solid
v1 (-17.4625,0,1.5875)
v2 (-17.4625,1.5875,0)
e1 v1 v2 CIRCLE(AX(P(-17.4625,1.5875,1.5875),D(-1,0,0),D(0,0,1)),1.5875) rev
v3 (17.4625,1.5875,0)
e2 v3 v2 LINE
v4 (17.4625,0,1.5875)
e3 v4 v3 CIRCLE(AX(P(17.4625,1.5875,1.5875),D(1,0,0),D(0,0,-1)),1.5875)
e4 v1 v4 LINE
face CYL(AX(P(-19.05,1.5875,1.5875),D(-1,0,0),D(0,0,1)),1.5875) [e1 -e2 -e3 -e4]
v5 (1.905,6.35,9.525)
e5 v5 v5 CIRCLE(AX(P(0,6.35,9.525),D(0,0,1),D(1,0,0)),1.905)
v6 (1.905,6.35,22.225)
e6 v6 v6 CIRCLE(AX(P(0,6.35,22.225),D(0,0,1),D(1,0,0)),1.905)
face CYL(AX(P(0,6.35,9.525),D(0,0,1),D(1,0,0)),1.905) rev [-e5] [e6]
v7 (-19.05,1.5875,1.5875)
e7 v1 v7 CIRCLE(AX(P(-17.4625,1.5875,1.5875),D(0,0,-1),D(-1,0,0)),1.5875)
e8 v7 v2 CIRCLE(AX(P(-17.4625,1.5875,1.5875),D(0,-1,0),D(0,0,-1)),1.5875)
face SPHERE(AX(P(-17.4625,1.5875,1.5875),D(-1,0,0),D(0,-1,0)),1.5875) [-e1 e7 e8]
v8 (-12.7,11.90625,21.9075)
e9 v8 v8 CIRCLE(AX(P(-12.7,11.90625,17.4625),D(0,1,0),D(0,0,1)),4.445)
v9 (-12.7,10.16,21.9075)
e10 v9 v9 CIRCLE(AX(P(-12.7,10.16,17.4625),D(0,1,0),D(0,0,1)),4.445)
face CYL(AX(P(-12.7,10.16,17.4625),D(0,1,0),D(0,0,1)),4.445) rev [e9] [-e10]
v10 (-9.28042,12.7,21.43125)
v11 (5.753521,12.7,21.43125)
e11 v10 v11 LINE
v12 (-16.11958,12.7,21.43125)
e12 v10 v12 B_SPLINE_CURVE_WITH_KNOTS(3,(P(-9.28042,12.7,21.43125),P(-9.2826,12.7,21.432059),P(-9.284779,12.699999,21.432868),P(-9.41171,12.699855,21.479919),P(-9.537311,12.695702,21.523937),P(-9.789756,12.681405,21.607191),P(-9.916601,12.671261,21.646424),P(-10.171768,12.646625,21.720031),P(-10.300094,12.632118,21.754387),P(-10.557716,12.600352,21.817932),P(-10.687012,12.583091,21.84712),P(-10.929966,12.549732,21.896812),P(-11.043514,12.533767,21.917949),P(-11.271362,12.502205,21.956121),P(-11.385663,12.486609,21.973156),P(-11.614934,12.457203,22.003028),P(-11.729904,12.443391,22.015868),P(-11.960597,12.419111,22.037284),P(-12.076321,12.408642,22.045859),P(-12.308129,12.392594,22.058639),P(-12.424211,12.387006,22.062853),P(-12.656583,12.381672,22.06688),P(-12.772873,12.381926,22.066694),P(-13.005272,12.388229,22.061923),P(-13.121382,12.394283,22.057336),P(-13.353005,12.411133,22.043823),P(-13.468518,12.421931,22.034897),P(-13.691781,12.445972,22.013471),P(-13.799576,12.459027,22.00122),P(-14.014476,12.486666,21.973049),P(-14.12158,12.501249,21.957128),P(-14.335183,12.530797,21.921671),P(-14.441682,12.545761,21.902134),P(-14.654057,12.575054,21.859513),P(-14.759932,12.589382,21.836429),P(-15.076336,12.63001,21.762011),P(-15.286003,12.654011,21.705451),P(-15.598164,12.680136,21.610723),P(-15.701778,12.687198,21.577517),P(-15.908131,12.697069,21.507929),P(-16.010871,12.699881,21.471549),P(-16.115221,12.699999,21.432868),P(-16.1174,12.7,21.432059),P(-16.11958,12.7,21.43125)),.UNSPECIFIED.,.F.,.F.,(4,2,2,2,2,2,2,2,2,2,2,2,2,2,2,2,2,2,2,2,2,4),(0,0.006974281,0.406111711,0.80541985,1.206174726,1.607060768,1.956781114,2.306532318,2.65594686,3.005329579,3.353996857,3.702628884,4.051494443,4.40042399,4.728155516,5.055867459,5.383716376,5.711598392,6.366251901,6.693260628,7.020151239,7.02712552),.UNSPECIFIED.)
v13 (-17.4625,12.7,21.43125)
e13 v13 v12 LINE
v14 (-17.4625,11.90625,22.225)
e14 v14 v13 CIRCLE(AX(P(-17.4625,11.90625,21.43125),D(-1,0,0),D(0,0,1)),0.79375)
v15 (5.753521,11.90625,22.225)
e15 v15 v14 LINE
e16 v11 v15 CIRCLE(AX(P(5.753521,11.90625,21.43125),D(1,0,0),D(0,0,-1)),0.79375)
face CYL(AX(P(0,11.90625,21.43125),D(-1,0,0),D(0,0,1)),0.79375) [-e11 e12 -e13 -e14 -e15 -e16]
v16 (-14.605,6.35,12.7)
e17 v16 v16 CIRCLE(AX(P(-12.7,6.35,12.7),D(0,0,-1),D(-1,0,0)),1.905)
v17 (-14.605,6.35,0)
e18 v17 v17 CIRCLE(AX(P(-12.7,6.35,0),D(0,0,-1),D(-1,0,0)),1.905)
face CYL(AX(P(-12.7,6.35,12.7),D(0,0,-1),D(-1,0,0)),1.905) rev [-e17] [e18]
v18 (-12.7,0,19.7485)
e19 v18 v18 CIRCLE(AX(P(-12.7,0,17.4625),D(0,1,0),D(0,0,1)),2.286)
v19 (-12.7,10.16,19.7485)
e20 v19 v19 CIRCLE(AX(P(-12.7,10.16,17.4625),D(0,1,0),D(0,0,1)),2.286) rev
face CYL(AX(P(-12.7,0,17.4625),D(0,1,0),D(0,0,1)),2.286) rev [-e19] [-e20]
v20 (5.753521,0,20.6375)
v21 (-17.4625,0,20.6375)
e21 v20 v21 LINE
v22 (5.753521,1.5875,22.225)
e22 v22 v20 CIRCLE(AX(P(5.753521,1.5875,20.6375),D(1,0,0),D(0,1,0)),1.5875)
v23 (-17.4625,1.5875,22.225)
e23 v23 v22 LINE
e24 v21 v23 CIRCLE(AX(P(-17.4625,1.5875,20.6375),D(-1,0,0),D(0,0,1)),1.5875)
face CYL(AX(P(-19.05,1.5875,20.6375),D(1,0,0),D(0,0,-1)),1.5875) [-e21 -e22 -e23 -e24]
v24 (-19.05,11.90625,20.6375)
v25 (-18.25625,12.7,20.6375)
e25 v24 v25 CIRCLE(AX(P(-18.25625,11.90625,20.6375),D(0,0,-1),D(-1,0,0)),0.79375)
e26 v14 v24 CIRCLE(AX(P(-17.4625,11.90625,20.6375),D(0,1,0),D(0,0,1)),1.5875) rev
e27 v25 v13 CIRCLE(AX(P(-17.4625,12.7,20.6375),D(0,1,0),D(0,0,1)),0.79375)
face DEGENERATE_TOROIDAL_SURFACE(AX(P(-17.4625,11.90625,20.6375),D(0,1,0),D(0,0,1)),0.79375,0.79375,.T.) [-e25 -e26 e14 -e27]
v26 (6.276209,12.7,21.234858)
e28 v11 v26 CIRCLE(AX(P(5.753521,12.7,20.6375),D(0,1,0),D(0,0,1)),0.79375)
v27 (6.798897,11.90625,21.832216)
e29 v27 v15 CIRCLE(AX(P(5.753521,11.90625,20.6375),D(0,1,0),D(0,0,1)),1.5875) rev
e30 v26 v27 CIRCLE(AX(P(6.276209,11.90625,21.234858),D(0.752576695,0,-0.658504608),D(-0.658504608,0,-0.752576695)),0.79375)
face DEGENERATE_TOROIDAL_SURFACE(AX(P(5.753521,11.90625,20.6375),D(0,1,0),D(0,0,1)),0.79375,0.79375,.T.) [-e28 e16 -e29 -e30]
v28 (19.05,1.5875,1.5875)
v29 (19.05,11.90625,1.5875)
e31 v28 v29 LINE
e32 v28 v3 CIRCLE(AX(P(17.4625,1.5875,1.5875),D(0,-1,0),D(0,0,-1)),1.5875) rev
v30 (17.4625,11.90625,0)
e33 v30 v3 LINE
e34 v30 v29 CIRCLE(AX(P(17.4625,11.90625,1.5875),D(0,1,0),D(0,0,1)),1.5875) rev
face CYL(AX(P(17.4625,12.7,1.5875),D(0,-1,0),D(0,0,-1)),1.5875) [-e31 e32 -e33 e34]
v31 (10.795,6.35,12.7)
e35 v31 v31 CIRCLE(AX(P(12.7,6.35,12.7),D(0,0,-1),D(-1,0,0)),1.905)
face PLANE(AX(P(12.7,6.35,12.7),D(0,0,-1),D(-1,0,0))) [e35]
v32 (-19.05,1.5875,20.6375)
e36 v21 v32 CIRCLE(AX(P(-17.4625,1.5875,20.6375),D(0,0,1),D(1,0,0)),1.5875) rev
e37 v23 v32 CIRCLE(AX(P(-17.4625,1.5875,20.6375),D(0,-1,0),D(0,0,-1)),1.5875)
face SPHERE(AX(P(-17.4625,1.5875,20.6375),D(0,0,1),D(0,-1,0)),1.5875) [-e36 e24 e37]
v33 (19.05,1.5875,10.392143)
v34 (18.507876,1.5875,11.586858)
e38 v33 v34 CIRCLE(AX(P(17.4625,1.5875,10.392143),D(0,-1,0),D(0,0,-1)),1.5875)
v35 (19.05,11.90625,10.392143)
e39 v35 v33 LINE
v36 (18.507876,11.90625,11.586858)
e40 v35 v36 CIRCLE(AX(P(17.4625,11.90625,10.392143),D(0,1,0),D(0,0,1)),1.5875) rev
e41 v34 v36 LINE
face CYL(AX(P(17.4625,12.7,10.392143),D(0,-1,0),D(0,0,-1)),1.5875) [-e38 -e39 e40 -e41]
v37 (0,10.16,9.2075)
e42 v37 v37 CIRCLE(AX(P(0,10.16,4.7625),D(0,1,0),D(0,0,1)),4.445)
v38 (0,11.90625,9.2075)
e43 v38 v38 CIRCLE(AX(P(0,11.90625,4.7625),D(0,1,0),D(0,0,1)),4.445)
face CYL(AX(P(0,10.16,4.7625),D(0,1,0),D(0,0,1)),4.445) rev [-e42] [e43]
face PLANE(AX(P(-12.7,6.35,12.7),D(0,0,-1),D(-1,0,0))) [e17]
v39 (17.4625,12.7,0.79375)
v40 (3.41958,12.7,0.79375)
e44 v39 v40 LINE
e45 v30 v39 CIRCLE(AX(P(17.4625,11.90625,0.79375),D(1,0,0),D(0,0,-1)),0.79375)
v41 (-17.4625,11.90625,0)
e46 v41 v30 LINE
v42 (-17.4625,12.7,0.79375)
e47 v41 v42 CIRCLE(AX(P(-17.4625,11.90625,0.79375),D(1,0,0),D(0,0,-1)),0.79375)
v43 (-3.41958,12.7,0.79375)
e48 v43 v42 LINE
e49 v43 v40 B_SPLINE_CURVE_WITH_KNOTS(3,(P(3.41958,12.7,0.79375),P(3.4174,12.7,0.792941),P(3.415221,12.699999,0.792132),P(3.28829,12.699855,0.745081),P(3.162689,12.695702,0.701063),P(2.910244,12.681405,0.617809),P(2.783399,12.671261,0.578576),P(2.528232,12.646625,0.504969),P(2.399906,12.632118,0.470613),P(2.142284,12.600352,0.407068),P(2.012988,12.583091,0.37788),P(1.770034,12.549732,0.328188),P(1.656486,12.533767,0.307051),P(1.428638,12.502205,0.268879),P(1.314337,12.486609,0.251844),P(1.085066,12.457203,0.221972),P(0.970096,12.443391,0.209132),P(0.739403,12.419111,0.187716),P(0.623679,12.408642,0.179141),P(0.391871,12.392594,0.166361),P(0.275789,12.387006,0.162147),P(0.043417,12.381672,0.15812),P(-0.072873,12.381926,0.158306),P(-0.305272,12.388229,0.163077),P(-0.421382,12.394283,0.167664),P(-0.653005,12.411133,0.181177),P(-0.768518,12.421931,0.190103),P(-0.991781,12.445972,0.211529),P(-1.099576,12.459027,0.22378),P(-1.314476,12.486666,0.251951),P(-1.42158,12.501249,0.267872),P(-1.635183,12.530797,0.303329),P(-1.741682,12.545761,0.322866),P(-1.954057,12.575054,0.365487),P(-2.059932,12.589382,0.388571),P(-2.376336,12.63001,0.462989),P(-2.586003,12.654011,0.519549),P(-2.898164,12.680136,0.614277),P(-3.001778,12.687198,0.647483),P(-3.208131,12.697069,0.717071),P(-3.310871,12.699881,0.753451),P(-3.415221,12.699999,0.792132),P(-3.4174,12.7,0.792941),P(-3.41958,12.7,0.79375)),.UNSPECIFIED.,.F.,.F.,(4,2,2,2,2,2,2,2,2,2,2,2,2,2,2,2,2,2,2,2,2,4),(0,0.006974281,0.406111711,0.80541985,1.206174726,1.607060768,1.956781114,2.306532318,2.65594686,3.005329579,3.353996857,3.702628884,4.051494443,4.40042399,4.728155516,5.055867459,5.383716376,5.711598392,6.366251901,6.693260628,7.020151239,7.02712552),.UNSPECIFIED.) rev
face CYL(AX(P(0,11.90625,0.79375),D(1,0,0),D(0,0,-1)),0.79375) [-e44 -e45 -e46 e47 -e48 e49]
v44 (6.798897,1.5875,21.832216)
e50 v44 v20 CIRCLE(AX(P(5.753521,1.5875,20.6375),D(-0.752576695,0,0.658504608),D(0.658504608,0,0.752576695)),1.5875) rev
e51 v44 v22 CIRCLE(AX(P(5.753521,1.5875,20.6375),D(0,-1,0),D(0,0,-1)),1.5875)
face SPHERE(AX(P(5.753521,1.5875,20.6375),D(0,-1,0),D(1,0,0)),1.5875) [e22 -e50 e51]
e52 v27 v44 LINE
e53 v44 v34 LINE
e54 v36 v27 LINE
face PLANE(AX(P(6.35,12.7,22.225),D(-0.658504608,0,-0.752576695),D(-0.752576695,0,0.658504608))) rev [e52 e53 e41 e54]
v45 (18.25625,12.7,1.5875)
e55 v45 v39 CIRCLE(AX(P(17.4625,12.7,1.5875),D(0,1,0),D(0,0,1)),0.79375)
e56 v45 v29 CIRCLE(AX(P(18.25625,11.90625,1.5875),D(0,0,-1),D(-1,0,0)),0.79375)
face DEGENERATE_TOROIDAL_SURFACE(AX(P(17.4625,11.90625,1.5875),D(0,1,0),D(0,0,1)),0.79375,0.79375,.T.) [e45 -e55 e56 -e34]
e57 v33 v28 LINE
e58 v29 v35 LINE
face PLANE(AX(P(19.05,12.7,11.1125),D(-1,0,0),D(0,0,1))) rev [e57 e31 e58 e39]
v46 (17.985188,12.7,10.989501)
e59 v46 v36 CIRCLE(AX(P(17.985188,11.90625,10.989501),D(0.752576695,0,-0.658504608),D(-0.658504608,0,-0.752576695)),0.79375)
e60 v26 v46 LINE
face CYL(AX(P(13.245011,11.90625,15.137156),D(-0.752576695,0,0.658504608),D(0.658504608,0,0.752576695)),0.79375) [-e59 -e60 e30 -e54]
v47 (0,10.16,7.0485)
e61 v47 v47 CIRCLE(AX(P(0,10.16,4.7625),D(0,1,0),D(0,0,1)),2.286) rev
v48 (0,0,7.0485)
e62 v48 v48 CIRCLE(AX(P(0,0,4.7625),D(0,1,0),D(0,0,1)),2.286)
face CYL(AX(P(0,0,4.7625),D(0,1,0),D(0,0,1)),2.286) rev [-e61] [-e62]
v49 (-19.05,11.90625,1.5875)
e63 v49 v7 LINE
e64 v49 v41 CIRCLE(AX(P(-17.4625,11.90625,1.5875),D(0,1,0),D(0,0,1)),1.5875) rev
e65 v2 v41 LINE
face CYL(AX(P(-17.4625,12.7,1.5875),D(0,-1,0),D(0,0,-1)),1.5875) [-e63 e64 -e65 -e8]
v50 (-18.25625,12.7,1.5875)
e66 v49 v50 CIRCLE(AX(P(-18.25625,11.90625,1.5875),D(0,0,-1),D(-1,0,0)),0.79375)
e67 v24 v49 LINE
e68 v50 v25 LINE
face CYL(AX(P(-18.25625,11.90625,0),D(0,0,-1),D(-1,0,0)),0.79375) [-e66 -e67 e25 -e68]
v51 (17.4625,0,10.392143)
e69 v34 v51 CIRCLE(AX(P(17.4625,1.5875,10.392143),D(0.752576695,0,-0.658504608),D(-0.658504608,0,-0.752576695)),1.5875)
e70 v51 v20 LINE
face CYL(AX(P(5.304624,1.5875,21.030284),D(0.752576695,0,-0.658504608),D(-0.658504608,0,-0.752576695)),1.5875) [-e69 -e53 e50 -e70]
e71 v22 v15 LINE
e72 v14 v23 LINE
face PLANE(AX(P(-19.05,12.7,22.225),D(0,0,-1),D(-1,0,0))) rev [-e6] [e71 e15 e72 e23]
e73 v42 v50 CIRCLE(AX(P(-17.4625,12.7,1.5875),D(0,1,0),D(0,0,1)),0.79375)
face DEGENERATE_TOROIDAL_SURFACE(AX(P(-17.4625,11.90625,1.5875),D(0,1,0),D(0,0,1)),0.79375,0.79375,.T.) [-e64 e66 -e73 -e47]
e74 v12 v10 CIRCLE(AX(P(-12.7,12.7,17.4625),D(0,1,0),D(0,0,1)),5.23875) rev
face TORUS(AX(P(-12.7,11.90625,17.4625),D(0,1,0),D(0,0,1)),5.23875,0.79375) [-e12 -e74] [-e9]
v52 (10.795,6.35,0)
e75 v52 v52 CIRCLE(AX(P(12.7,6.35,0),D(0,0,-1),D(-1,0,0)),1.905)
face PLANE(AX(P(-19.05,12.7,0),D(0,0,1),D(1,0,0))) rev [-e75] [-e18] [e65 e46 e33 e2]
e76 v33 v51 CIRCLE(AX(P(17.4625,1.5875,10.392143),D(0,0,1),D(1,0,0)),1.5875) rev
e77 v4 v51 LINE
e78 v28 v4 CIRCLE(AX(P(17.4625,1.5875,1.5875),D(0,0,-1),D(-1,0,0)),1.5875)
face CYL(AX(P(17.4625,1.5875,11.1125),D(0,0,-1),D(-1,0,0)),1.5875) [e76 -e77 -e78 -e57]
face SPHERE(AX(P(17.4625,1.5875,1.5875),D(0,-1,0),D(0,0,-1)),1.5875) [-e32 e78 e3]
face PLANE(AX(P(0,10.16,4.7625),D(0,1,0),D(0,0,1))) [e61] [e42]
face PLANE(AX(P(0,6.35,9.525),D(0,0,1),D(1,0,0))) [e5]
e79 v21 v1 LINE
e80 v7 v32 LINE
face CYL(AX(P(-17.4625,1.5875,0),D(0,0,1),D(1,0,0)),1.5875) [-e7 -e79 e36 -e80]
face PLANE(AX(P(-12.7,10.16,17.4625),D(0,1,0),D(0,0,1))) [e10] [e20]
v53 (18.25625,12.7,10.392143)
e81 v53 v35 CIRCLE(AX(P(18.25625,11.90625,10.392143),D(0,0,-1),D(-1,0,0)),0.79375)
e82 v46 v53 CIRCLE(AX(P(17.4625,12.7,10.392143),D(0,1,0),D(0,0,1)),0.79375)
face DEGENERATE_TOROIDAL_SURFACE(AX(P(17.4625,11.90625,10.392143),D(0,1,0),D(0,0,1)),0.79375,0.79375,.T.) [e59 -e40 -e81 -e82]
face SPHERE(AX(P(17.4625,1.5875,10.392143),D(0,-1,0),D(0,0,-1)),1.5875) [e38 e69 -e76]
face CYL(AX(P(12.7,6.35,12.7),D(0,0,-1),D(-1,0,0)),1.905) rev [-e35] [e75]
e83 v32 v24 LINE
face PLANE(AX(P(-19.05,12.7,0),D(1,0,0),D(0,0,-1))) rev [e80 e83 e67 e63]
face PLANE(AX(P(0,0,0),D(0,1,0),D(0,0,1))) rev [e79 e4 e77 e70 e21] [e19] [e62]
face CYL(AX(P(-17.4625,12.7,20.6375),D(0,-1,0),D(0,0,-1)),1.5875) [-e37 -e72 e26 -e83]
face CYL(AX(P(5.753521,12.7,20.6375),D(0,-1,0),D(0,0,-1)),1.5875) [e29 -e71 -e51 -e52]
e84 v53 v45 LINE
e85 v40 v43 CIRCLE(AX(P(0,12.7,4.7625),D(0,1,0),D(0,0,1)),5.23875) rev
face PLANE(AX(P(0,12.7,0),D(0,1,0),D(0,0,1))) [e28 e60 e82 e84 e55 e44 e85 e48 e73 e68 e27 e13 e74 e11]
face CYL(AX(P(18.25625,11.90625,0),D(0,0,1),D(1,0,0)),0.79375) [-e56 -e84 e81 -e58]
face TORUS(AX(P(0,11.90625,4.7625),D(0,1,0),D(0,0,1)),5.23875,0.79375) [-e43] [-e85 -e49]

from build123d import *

# Parameters (mm, degrees)
BOSS_EXTRUDE1_DEPTH = 12.7
SKETCH2_R           = 2.286
CUT_EXTRUDE1_DEPTH  = 32.908355097
SKETCH3_R           = 4.445
CUT_EXTRUDE2_DEPTH  = 2.54
SKETCH4_R           = 1.905
CUT_EXTRUDE3_DEPTH  = 12.7
SKETCH5_R           = 1.905
CUT_EXTRUDE4_DEPTH  = 12.7
FILLET1_R           = 1.5875
FILLET2_R           = 0.79375


with BuildPart() as part:
    # Sketch1 → Boss-Extrude1 (new body)
    with BuildSketch(Plane(origin=(0, 0, 0), x_dir=(1, 0, 0), z_dir=(0, 1, 0))):
        Polygon((-19.05, 0), (19.05, 0), (19.05, -11.1125), (6.35, -22.225), (-19.05, -22.225), align=None)
    extrude(amount=BOSS_EXTRUDE1_DEPTH)

    # Sketch2 → Cut-Extrude1 (cut, through all)
    with BuildSketch(Plane(origin=(0, 12.7, 0), x_dir=(1, 0, 0), z_dir=(0, 1, 0))):
        with Locations(Location((0, -4.7625, 0), (0, 0, 270))):
            Circle(SKETCH2_R)
        with Locations(Location((-12.7, -17.4625, 0), (0, 0, 270))):
            Circle(SKETCH2_R)
    extrude(amount=-CUT_EXTRUDE1_DEPTH, mode=Mode.SUBTRACT)

    # Sketch3 → Cut-Extrude2 (cut)
    with BuildSketch(Plane(origin=(0, 12.7, 0), x_dir=(1, 0, 0), z_dir=(0, 1, 0))):
        with Locations(Location((0, -4.7625, 0), (0, 0, 270))):
            Circle(SKETCH3_R)
        with Locations(Location((-12.7, -17.4625, 0), (0, 0, 270))):
            Circle(SKETCH3_R)
    extrude(amount=-CUT_EXTRUDE2_DEPTH, mode=Mode.SUBTRACT)

    # Sketch4 → Cut-Extrude3 (cut)
    with BuildSketch(Plane(origin=(0, 0, 0), x_dir=(-1, 0, 0), z_dir=(0, 0, -1))):
        with Locations((-12.7, 6.35)):
            Circle(SKETCH4_R)
        with Locations((12.7, 6.35)):
            Circle(SKETCH4_R)
    extrude(amount=-CUT_EXTRUDE3_DEPTH, mode=Mode.SUBTRACT)

    # Sketch5 → Cut-Extrude4 (cut)
    with BuildSketch(Plane.XY.offset(22.225)):
        with Locations((0, 6.35)):
            Circle(SKETCH5_R)
    extrude(amount=-CUT_EXTRUDE4_DEPTH, mode=Mode.SUBTRACT)

    # Fillet1
    fillet1_edges = [part.edges().sort_by_distance(p)[0] for p in [
        (-19.05, 0, 11.1125),
        (0, 0, 0),
        (19.05, 0, 5.55625),
        (12.7, 0, 16.66875),
        (-6.35, 0, 22.225),
        (-19.05, 6.35, 22.225),
        (-19.05, 6.35, 0),
        (19.05, 6.35, 0),
        (19.05, 6.35, 11.1125),
        (6.35, 6.35, 22.225),
    ]]
    fillet(fillet1_edges, radius=FILLET1_R)

    # Fillet2
    # the kernel refuses this fillet: 0.79375 mm, written as the material it takes off along each edge
    with BuildSketch(Plane(origin=(0, 12.7, 4.7625), x_dir=(0, 0, 1), z_dir=(-1, 0, 0))) as fillet2_piece_1:
        with BuildLine():
            CenterArc((4.445 + FILLET2_R, -FILLET2_R), FILLET2_R, 90, 90)
            Line((4.445, -FILLET2_R), (4.445, 0))
            Line((4.445, 0), (4.445 + FILLET2_R, 0))
        make_face()
    revolve(axis=Axis((0, 12.7, 4.7625), (0, 1, 0)), mode=Mode.SUBTRACT)
    with BuildSketch(Plane(origin=(-12.7, 12.7, 17.4625), x_dir=(0, 0, 1), z_dir=(-1, 0, 0))) as fillet2_piece_2:
        with BuildLine():
            CenterArc((4.445 + FILLET2_R, -FILLET2_R), FILLET2_R, 90, 90)
            Line((4.445, -FILLET2_R), (4.445, 0))
            Line((4.445, 0), (4.445 + FILLET2_R, 0))
        make_face()
    revolve(axis=Axis((-12.7, 12.7, 17.4625), (0, 1, 0)), mode=Mode.SUBTRACT)
    with BuildSketch(Plane(origin=(-17.4625, 12.7, 0), x_dir=(0, -1, 0), z_dir=(1, 0, 0))) as fillet2_piece_3:
        with BuildLine():
            CenterArc((FILLET2_R, -FILLET2_R), FILLET2_R, 90, 90)
            Line((0, -FILLET2_R), (0, 0))
            Line((0, 0), (FILLET2_R, 0))
        make_face()
    extrude(amount=34.925, mode=Mode.SUBTRACT)
    with BuildSketch(Plane(origin=(19.05, 12.7, 1.5875), x_dir=(-1, 0, 0), z_dir=(0, 0, 1))) as fillet2_piece_4:
        with BuildLine():
            CenterArc((FILLET2_R, FILLET2_R), FILLET2_R, 180, 90)
            Line((0, FILLET2_R), (0, 0))
            Line((0, 0), (FILLET2_R, 0))
        make_face()
    extrude(amount=8.80464294, mode=Mode.SUBTRACT)
    with BuildSketch(Plane(origin=(5.753520503, 12.7, 22.225), x_dir=(0, 0, -1), z_dir=(-1, 0, 0))) as fillet2_piece_5:
        with BuildLine():
            CenterArc((FILLET2_R, FILLET2_R), FILLET2_R, 180, 90)
            Line((0, FILLET2_R), (0, 0))
            Line((0, 0), (FILLET2_R, 0))
        make_face()
    extrude(amount=23.216020503, mode=Mode.SUBTRACT)
    with BuildSketch(Plane(origin=(18.507876065, 12.7, 11.586858443), x_dir=(-0.6585046078685184, 0, -0.7525766947068776), z_dir=(-0.7525766947068777, 0, 0.6585046078685184))) as fillet2_piece_6:
        with BuildLine():
            CenterArc((FILLET2_R, FILLET2_R), FILLET2_R, 180, 90)
            Line((0, FILLET2_R), (0, 0))
            Line((0, 0), (FILLET2_R, 0))
        make_face()
    extrude(amount=15.558519921, mode=Mode.SUBTRACT)
    with BuildSketch(Plane(origin=(-19.05, 12.7, 20.6375), x_dir=(1, 0, 0), z_dir=(0, 0, -1))) as fillet2_piece_7:
        with BuildLine():
            CenterArc((FILLET2_R, FILLET2_R), FILLET2_R, 180, 90)
            Line((0, FILLET2_R), (0, 0))
            Line((0, 0), (FILLET2_R, 0))
        make_face()
    extrude(amount=19.05, mode=Mode.SUBTRACT)
    with BuildSketch(Plane(origin=(-17.4625, 12.7, 20.6375), x_dir=(-1, 0, 0), z_dir=(0, 0, -1))) as fillet2_piece_8:
        with BuildLine():
            CenterArc((1.5875 - FILLET2_R, -FILLET2_R), FILLET2_R, 0, 90)
            Line((1.5875, -FILLET2_R), (1.5875, 0))
            Line((1.5875, 0), (1.5875 - FILLET2_R, 0))
        make_face()
    revolve(axis=Axis((-17.4625, 12.7, 20.6375), (0, 1, 0)), revolution_arc=90, mode=Mode.SUBTRACT)
    with BuildSketch(Plane(origin=(-17.4625, 12.7, 1.5875), x_dir=(0, 0, -1), z_dir=(1, 0, 0))) as fillet2_piece_9:
        with BuildLine():
            CenterArc((1.5875 - FILLET2_R, -FILLET2_R), FILLET2_R, 0, 90)
            Line((1.5875, -FILLET2_R), (1.5875, 0))
            Line((1.5875, 0), (1.5875 - FILLET2_R, 0))
        make_face()
    revolve(axis=Axis((-17.4625, 12.7, 1.5875), (0, 1, 0)), revolution_arc=90, mode=Mode.SUBTRACT)
    with BuildSketch(Plane(origin=(5.753520503, 12.7, 20.6375), x_dir=(0, 0, 1), z_dir=(-1, 0, 0))) as fillet2_piece_10:
        with BuildLine():
            CenterArc((1.5875 - FILLET2_R, -FILLET2_R), FILLET2_R, 0, 90)
            Line((1.5875, -FILLET2_R), (1.5875, 0))
            Line((1.5875, 0), (1.5875 - FILLET2_R, 0))
        make_face()
    revolve(axis=Axis((5.753520503, 12.7, 20.6375), (0, 1, 0)), revolution_arc=41.185925166, mode=Mode.SUBTRACT)
    with BuildSketch(Plane(origin=(17.4625, 12.7, 10.39214294), x_dir=(1, 0, 0), z_dir=(0, 0, -1))) as fillet2_piece_11:
        with BuildLine():
            CenterArc((1.5875 - FILLET2_R, FILLET2_R), FILLET2_R, 270, 90)
            Line((1.5875, FILLET2_R), (1.5875, 0))
            Line((1.5875, 0), (1.5875 - FILLET2_R, 0))
        make_face()
    revolve(axis=Axis((17.4625, 12.7, 10.39214294), (0, -1, 0)), revolution_arc=48.814074834, mode=Mode.SUBTRACT)
    with BuildSketch(Plane(origin=(17.4625, 12.7, 1.5875), x_dir=(0, 0, -1), z_dir=(-1, 0, 0))) as fillet2_piece_12:
        with BuildLine():
            CenterArc((1.5875 - FILLET2_R, FILLET2_R), FILLET2_R, 270, 90)
            Line((1.5875, FILLET2_R), (1.5875, 0))
            Line((1.5875, 0), (1.5875 - FILLET2_R, 0))
        make_face()
    revolve(axis=Axis((17.4625, 12.7, 1.5875), (0, -1, 0)), revolution_arc=90, mode=Mode.SUBTRACT)


solid = part.part
